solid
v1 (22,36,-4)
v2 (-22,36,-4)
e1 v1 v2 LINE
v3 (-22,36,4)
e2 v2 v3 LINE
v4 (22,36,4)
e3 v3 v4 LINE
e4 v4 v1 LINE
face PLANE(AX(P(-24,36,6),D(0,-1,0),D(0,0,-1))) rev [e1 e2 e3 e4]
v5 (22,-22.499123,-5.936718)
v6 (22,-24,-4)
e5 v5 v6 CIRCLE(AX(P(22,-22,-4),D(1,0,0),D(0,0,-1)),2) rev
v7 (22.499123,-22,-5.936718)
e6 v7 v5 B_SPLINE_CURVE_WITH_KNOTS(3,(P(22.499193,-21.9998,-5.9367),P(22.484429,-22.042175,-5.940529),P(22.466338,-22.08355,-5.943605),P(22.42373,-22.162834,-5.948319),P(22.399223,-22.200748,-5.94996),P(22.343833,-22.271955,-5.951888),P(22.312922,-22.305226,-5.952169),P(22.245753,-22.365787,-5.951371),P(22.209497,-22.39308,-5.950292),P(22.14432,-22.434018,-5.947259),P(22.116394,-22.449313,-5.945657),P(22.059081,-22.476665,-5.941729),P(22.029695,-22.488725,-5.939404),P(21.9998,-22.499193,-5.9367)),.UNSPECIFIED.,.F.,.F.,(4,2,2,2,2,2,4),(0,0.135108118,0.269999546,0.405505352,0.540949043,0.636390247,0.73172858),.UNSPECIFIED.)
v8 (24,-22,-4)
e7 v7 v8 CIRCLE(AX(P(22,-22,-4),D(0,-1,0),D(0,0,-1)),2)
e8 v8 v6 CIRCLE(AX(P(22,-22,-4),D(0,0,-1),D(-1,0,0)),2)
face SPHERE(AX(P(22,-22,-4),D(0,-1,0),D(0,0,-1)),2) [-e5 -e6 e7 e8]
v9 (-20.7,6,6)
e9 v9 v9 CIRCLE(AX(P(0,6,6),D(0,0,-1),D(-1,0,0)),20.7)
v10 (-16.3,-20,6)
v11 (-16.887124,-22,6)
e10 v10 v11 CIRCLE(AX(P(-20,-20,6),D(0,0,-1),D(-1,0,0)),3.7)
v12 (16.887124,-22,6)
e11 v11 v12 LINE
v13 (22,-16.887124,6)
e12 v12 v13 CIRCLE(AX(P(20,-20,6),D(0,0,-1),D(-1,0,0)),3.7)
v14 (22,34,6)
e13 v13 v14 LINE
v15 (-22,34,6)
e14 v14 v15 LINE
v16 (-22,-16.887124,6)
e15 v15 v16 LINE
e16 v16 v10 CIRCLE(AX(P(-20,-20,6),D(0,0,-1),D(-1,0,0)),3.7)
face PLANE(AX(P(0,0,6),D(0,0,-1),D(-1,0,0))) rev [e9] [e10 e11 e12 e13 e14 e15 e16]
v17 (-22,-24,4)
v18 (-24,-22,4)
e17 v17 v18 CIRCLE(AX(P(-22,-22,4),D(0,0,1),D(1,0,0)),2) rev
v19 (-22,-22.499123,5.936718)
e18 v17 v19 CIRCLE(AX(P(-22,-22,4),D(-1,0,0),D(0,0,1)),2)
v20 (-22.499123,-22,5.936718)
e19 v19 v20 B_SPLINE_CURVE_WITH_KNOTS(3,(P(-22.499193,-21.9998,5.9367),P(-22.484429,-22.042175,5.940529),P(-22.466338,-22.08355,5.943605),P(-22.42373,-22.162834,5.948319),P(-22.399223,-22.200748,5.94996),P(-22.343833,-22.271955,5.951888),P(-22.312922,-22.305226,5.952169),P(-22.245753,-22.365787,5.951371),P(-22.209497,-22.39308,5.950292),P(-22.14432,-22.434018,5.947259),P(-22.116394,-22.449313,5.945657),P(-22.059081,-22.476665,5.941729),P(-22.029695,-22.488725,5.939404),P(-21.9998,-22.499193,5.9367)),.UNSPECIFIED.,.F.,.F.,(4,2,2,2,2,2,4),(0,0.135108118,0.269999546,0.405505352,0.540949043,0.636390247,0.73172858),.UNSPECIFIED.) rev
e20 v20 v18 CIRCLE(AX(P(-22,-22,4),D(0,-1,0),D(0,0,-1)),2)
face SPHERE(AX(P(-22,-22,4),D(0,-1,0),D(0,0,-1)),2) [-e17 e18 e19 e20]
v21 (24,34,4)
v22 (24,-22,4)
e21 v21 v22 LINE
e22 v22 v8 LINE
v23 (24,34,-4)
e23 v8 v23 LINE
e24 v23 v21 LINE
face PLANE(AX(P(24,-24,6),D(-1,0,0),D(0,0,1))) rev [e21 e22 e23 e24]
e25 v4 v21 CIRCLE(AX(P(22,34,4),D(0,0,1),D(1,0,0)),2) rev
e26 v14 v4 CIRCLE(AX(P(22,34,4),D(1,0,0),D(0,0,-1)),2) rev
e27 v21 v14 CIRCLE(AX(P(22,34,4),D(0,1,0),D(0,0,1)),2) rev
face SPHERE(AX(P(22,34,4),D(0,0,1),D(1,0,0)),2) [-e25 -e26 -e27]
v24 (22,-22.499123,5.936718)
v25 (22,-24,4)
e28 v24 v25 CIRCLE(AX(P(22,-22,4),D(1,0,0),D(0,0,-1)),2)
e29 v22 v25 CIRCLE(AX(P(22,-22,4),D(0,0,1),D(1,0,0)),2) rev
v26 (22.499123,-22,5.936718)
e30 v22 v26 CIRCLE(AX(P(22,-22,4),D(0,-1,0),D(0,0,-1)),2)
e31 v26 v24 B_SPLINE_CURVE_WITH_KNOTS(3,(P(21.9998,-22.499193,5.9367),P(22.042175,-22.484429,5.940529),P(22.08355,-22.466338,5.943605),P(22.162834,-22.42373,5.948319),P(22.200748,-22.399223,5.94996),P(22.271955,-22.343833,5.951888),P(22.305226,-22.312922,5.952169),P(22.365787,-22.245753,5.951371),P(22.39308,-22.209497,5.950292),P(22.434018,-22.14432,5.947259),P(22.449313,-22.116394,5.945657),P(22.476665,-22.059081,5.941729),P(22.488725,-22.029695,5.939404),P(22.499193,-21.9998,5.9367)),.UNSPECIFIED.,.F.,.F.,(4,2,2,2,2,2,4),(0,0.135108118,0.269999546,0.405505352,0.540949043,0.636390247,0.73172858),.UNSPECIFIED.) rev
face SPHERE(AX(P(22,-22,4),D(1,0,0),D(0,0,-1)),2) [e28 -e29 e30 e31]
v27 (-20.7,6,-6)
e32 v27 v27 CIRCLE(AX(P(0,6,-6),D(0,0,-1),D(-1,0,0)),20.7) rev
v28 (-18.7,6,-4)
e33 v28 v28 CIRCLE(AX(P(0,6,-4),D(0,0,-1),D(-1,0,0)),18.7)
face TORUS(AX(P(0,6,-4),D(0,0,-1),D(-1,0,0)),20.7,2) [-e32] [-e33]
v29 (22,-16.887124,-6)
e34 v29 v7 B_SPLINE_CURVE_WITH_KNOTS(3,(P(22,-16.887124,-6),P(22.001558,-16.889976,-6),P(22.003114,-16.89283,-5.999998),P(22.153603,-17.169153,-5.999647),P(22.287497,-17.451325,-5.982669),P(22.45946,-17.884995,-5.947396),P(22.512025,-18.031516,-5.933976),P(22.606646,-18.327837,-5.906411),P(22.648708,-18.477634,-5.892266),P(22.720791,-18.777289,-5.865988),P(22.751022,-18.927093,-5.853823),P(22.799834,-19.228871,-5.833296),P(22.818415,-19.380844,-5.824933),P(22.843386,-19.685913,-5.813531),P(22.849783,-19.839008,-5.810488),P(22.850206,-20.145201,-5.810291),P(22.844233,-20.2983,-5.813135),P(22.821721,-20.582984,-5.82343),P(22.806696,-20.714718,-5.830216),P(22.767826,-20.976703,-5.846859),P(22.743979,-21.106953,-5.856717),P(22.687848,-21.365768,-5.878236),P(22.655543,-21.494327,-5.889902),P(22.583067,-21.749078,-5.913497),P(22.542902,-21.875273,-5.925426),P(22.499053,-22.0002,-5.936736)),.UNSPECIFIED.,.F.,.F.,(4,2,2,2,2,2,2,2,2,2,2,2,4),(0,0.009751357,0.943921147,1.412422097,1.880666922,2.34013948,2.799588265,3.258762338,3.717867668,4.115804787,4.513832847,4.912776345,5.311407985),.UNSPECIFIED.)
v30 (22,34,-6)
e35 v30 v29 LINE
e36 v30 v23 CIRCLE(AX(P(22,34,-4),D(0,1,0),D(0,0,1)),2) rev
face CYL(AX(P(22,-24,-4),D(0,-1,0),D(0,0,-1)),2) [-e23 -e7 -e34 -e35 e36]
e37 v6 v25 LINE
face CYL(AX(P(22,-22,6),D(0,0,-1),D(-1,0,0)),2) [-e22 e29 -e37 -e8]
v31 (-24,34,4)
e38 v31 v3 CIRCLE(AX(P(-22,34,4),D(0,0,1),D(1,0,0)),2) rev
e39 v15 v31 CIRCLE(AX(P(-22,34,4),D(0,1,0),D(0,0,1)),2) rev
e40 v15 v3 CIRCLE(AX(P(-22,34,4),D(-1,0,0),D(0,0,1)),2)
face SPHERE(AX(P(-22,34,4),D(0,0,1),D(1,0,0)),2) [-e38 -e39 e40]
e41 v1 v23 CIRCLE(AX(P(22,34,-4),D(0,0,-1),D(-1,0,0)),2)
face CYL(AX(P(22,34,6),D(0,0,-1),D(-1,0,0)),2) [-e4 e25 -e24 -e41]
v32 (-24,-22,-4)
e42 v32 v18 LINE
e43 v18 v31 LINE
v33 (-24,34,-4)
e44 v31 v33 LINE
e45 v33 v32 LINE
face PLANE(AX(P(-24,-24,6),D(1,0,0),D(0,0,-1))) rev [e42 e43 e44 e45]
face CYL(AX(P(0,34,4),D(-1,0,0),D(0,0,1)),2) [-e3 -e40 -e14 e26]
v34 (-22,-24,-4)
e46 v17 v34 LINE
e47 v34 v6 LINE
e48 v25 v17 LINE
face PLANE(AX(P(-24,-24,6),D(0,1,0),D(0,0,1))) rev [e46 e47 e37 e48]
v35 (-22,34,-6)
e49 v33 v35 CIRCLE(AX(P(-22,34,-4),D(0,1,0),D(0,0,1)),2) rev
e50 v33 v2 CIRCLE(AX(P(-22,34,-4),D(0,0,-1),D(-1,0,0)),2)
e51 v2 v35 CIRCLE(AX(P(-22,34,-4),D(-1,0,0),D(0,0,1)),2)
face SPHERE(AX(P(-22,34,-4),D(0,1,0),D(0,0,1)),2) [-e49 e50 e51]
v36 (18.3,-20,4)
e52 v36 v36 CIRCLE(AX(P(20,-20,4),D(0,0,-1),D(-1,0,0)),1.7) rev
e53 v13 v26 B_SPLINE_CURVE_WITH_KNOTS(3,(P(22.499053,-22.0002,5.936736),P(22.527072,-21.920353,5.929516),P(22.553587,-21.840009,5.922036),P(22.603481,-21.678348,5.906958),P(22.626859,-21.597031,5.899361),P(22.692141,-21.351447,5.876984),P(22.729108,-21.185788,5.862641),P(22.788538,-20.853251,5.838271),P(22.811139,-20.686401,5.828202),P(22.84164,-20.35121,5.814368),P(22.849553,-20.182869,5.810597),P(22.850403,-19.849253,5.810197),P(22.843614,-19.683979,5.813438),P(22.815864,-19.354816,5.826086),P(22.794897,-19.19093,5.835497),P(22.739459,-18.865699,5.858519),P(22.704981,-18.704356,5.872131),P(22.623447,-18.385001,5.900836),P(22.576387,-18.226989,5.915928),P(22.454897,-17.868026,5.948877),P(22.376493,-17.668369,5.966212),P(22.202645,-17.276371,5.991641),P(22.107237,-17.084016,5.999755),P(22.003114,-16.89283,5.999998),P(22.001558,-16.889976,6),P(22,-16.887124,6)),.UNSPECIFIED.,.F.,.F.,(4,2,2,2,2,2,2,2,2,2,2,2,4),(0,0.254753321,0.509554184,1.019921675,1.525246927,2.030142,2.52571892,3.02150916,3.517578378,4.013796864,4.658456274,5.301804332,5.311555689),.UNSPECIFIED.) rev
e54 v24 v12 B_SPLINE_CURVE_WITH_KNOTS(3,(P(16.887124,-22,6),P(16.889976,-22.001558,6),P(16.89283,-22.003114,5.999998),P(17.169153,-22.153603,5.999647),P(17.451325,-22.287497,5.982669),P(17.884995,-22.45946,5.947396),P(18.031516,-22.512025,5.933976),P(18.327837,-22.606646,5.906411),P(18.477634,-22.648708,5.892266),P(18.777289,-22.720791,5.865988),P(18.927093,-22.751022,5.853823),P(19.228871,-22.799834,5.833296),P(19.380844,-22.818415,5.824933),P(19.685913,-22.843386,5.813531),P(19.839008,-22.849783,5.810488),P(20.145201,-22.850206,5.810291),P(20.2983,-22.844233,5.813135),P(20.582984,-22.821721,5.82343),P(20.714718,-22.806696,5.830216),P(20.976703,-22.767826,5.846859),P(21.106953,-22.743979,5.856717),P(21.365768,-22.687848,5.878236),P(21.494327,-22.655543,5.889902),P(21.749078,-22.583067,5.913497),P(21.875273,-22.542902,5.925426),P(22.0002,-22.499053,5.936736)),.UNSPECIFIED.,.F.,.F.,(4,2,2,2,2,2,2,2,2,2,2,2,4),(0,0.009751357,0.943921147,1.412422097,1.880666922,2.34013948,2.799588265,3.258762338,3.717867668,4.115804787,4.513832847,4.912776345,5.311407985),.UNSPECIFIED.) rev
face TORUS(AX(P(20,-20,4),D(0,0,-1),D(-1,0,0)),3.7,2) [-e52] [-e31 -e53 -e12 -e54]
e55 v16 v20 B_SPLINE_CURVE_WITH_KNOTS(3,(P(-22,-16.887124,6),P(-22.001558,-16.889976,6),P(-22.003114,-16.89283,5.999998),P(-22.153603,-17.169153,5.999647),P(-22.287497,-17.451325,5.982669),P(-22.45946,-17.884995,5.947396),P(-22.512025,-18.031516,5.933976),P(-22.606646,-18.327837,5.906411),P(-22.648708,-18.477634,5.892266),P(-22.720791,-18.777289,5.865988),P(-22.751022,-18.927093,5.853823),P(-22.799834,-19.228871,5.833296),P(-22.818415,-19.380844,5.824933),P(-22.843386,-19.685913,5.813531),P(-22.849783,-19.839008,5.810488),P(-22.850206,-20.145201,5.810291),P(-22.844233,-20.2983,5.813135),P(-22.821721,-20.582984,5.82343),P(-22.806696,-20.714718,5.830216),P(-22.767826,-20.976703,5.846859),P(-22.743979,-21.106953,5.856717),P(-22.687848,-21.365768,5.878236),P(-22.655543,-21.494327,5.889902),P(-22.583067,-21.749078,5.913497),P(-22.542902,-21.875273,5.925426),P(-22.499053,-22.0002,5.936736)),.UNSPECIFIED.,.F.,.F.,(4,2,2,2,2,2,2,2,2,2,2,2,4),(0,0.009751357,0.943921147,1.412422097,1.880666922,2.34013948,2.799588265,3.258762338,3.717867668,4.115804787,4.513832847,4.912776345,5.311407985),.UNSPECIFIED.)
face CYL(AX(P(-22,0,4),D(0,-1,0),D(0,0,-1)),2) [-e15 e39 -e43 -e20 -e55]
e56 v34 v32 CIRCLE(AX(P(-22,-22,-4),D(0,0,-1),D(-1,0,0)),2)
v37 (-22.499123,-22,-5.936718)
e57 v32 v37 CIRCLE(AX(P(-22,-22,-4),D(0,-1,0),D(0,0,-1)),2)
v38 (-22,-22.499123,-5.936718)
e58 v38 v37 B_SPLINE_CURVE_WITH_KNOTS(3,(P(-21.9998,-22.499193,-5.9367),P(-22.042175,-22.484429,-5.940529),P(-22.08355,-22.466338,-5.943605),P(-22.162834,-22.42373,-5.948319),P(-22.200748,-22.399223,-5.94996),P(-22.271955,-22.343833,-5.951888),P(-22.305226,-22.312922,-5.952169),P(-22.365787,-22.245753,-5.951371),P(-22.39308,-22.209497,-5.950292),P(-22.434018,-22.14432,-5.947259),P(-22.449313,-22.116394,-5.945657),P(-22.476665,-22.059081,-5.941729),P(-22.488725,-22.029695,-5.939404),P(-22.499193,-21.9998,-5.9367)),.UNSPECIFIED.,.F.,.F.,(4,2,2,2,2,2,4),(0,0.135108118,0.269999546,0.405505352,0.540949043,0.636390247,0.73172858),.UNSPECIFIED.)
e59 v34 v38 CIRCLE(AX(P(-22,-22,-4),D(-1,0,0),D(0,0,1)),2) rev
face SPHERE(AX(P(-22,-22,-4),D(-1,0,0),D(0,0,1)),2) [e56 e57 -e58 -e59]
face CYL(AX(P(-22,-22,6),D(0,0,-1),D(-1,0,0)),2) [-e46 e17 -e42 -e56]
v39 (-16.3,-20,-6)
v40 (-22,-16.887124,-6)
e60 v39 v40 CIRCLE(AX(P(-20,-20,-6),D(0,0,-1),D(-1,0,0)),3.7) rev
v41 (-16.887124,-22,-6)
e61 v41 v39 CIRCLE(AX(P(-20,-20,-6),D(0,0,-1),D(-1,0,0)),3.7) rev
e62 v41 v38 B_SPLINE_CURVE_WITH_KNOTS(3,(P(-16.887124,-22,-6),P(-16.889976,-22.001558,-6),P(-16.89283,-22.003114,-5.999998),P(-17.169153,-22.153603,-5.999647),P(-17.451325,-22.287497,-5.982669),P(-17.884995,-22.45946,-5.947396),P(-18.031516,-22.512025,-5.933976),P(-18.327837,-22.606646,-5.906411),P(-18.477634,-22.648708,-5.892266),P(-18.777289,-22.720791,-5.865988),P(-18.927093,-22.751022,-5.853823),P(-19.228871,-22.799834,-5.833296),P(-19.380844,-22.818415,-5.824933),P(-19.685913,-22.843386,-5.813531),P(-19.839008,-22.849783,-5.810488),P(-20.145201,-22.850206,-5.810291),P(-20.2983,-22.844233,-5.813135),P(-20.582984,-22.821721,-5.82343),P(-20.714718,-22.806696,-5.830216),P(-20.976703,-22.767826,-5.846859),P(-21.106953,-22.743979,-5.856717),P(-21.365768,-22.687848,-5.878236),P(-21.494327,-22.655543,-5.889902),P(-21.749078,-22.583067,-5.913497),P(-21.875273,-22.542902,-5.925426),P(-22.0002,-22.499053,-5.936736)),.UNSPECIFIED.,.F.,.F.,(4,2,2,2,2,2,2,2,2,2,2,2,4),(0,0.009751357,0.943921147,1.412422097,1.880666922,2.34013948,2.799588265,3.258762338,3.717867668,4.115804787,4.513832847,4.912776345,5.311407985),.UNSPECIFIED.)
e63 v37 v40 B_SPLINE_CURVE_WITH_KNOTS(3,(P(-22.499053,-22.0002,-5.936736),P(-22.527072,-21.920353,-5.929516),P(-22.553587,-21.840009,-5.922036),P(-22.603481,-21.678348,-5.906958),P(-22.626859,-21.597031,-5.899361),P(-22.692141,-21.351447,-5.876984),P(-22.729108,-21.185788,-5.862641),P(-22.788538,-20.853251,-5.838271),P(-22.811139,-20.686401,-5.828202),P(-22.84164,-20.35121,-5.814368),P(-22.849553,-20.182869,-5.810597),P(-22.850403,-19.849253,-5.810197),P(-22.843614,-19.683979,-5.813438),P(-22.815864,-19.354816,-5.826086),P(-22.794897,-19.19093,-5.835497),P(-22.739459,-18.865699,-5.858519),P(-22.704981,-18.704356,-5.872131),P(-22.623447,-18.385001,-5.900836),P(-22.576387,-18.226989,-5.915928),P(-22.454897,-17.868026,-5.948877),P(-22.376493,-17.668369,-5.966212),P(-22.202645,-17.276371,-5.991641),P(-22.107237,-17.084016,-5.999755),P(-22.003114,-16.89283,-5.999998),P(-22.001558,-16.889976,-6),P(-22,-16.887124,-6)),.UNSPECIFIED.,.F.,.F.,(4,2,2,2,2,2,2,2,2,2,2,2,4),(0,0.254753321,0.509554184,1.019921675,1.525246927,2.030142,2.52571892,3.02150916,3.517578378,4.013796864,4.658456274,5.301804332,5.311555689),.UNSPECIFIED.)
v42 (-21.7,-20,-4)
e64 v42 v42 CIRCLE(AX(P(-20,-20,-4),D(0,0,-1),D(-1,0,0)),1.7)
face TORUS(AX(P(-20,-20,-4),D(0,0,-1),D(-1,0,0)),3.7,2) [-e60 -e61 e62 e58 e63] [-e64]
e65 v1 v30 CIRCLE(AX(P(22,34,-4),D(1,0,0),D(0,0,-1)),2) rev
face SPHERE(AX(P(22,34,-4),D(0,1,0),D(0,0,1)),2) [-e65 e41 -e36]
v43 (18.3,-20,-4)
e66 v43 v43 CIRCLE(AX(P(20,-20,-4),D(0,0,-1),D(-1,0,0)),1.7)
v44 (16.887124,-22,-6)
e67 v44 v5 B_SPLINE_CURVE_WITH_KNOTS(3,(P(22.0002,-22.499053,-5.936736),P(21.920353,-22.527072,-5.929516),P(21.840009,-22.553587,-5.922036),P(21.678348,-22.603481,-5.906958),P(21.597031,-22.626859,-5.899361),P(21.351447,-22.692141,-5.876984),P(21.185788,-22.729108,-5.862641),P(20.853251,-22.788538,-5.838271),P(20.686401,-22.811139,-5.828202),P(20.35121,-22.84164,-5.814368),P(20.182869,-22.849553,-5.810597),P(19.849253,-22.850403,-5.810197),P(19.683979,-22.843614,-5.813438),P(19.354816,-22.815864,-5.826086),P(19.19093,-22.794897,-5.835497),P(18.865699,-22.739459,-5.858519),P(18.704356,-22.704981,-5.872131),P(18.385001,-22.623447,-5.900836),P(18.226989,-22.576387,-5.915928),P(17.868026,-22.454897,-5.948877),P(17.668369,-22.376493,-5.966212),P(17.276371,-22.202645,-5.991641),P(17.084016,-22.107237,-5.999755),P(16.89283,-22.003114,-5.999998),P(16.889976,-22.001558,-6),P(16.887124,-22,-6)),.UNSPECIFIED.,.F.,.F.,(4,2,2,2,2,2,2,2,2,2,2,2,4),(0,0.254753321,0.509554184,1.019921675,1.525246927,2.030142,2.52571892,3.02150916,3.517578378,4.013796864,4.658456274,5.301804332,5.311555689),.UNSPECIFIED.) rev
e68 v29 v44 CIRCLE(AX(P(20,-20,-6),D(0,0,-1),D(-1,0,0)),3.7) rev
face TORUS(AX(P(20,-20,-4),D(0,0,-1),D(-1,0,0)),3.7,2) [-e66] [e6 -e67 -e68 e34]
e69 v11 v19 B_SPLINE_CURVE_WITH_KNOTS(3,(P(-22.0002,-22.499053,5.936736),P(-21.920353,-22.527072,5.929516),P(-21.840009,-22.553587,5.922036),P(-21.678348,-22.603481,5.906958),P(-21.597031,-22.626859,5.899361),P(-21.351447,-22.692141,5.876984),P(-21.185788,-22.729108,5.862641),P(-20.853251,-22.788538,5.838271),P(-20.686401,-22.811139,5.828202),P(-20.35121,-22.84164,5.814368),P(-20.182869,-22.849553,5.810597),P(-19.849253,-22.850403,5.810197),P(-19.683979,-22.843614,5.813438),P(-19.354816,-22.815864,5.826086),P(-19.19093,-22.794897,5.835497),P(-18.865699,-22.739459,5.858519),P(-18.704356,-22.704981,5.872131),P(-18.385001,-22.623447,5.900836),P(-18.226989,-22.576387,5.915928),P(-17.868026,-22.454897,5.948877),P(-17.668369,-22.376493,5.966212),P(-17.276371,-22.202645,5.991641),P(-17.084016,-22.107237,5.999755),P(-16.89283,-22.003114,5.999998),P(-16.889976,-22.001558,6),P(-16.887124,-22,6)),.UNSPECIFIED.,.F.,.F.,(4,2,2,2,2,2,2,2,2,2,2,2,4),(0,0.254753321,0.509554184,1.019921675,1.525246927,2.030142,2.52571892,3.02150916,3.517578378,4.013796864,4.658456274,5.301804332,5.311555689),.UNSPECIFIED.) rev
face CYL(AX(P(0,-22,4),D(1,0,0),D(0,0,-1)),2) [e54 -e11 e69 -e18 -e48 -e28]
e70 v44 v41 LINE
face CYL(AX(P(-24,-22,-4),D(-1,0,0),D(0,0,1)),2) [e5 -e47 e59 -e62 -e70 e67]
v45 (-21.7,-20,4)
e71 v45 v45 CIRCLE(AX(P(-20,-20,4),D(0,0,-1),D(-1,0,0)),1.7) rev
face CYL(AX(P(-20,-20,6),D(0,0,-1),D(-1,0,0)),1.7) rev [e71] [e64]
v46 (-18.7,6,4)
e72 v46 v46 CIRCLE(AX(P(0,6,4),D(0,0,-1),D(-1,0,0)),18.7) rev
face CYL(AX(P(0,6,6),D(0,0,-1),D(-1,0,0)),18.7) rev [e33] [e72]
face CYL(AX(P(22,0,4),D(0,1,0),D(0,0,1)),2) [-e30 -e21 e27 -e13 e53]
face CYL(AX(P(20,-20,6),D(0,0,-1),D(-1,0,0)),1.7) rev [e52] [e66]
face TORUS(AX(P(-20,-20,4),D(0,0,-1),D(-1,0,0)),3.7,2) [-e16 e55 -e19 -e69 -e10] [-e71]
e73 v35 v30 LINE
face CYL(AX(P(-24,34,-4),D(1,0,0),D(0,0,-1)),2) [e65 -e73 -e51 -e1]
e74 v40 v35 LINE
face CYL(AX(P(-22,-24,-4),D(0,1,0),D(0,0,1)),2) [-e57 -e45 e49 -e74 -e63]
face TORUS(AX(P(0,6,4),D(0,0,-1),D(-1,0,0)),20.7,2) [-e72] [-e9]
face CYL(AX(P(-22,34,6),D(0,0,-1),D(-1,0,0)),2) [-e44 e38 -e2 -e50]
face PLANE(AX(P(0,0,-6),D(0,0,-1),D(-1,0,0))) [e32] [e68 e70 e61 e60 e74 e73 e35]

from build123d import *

# Parameters (mm, degrees)
SKETCH_1_W      = 48
SKETCH_1_H      = 60
SKETCH_1_R      = 18.7
SKETCH_1_R_2    = 1.7
EXTRUDE_1_DEPTH = 6
FILLET_1_R      = 2


with BuildPart() as part:
    # 草图1 → 凸台-拉伸1 (new, symmetric)
    with BuildSketch(Plane.XY):
        with Locations((0, 6)):
            Rectangle(SKETCH_1_W, SKETCH_1_H)
        with Locations((0, 6)):
            Circle(SKETCH_1_R, mode=Mode.SUBTRACT)
        with Locations((20, -20)):
            Circle(SKETCH_1_R_2, mode=Mode.SUBTRACT)
        with Locations((-20, -20)):
            Circle(SKETCH_1_R_2, mode=Mode.SUBTRACT)
    extrude(amount=EXTRUDE_1_DEPTH, both=True)

    # 圆角1
    # the kernel refuses this fillet: 2 mm, written as the material it takes off along each edge
    with BuildSketch(Plane(origin=(-22, 34, 4), x_dir=(0, 1, 0), z_dir=(-1, 0, 0))) as fillet_1_piece_1_section:
        Polygon((0, 0), (FILLET_1_R, 0), (FILLET_1_R, -FILLET_1_R), (0, -FILLET_1_R), align=None)
    fillet_1_piece_1 = extrude(amount=FILLET_1_R, mode=Mode.PRIVATE)
    fillet_1_piece_1 = fillet_1_piece_1 - Plane(origin=(-22, 34, 4), x_dir=(0, -0.7071067811865475, -0.7071067811865475), z_dir=(-1, 0, 0)) * Sphere(FILLET_1_R, mode=Mode.PRIVATE)
    add(fillet_1_piece_1, mode=Mode.SUBTRACT)
    with BuildSketch(Plane(origin=(-22, -22, 4), x_dir=(-1, 0, 0), z_dir=(0, -1, 0))) as fillet_1_piece_2_section:
        Polygon((0, 0), (FILLET_1_R, 0), (FILLET_1_R, -FILLET_1_R), (0, -FILLET_1_R), align=None)
    fillet_1_piece_2 = extrude(amount=FILLET_1_R, mode=Mode.PRIVATE)
    fillet_1_piece_2 = fillet_1_piece_2 - Plane(origin=(-22, -22, 4), x_dir=(0.7071067811865475, 0, -0.7071067811865475), z_dir=(0, -1, 0)) * Sphere(FILLET_1_R, mode=Mode.PRIVATE)
    add(fillet_1_piece_2, mode=Mode.SUBTRACT)
    with BuildSketch(Plane(origin=(22, -22, 4), x_dir=(0, 0, 1), z_dir=(0, -1, 0))) as fillet_1_piece_3_section:
        Polygon((0, 0), (FILLET_1_R, 0), (FILLET_1_R, -FILLET_1_R), (0, -FILLET_1_R), align=None)
    fillet_1_piece_3 = extrude(amount=FILLET_1_R, mode=Mode.PRIVATE)
    fillet_1_piece_3 = fillet_1_piece_3 - Plane(origin=(22, -22, 4), x_dir=(-0.7071067811865475, 0, -0.7071067811865475), z_dir=(0, -1, 0)) * Sphere(FILLET_1_R, mode=Mode.PRIVATE)
    add(fillet_1_piece_3, mode=Mode.SUBTRACT)
    with BuildSketch(Plane(origin=(22, 34, 4), x_dir=(0, 0, 1), z_dir=(0, 1, 0))) as fillet_1_piece_4_section:
        Polygon((0, 0), (FILLET_1_R, 0), (FILLET_1_R, FILLET_1_R), (0, FILLET_1_R), align=None)
    fillet_1_piece_4 = extrude(amount=FILLET_1_R, mode=Mode.PRIVATE)
    fillet_1_piece_4 = fillet_1_piece_4 - Plane(origin=(22, 34, 4), x_dir=(-0.7071067811865475, 0, -0.7071067811865475), z_dir=(0, 1, 0)) * Sphere(FILLET_1_R, mode=Mode.PRIVATE)
    add(fillet_1_piece_4, mode=Mode.SUBTRACT)
    with BuildSketch(Plane(origin=(-22, -22, -4), x_dir=(0, 0, -1), z_dir=(0, -1, 0))) as fillet_1_piece_5_section:
        Polygon((0, 0), (FILLET_1_R, 0), (FILLET_1_R, -FILLET_1_R), (0, -FILLET_1_R), align=None)
    fillet_1_piece_5 = extrude(amount=FILLET_1_R, mode=Mode.PRIVATE)
    fillet_1_piece_5 = fillet_1_piece_5 - Plane(origin=(-22, -22, -4), x_dir=(0.7071067811865475, 0, 0.7071067811865475), z_dir=(0, -1, 0)) * Sphere(FILLET_1_R, mode=Mode.PRIVATE)
    add(fillet_1_piece_5, mode=Mode.SUBTRACT)
    with BuildSketch(Plane(origin=(22, -22, -4), x_dir=(0, 0, -1), z_dir=(0, -1, 0))) as fillet_1_piece_6_section:
        Polygon((0, 0), (FILLET_1_R, 0), (FILLET_1_R, FILLET_1_R), (0, FILLET_1_R), align=None)
    fillet_1_piece_6 = extrude(amount=FILLET_1_R, mode=Mode.PRIVATE)
    fillet_1_piece_6 = fillet_1_piece_6 - Plane(origin=(22, -22, -4), x_dir=(-0.7071067811865475, 0, 0.7071067811865475), z_dir=(0, -1, 0)) * Sphere(FILLET_1_R, mode=Mode.PRIVATE)
    add(fillet_1_piece_6, mode=Mode.SUBTRACT)
    with BuildSketch(Plane(origin=(-22, 34, -4), x_dir=(-1, 0, 0), z_dir=(0, 0, -1))) as fillet_1_piece_7_section:
        Polygon((0, 0), (FILLET_1_R, 0), (FILLET_1_R, FILLET_1_R), (0, FILLET_1_R), align=None)
    fillet_1_piece_7 = extrude(amount=FILLET_1_R, mode=Mode.PRIVATE)
    fillet_1_piece_7 = fillet_1_piece_7 - Plane(origin=(-22, 34, -4), x_dir=(0.7071067811865475, -0.7071067811865475, 0), z_dir=(0, 0, -1)) * Sphere(FILLET_1_R, mode=Mode.PRIVATE)
    add(fillet_1_piece_7, mode=Mode.SUBTRACT)
    with BuildSketch(Plane(origin=(22, 34, -4), x_dir=(0, 1, 0), z_dir=(0, 0, -1))) as fillet_1_piece_8_section:
        Polygon((0, 0), (FILLET_1_R, 0), (FILLET_1_R, FILLET_1_R), (0, FILLET_1_R), align=None)
    fillet_1_piece_8 = extrude(amount=FILLET_1_R, mode=Mode.PRIVATE)
    fillet_1_piece_8 = fillet_1_piece_8 - Plane(origin=(22, 34, -4), x_dir=(-0.7071067811865475, -0.7071067811865475, 0), z_dir=(0, 0, -1)) * Sphere(FILLET_1_R, mode=Mode.PRIVATE)
    add(fillet_1_piece_8, mode=Mode.SUBTRACT)
    with BuildSketch(Plane(origin=(0, 6, -6), x_dir=(1, 0, 0), z_dir=(0, -1, 0))) as fillet_1_piece_9:
        with BuildLine():
            CenterArc((18.7 + FILLET_1_R, FILLET_1_R), FILLET_1_R, 180, 90)
            Line((18.7 + FILLET_1_R, 0), (18.7, 0))
            Line((18.7, 0), (18.7, FILLET_1_R))
        make_face()
    revolve(axis=Axis((0, 6, -6), (0, 0, 1)), mode=Mode.SUBTRACT)
    with BuildSketch(Plane(origin=(0, 6, 6), x_dir=(1, 0, 0), z_dir=(0, -1, 0))) as fillet_1_piece_10:
        with BuildLine():
            CenterArc((18.7 + FILLET_1_R, -FILLET_1_R), FILLET_1_R, 90, 90)
            Line((18.7, -FILLET_1_R), (18.7, 0))
            Line((18.7, 0), (18.7 + FILLET_1_R, 0))
        make_face()
    revolve(axis=Axis((0, 6, 6), (0, 0, 1)), mode=Mode.SUBTRACT)
    with BuildSketch(Plane(origin=(-24, 34, 6), x_dir=(0, 0, -1), z_dir=(0, -1, 0))) as fillet_1_piece_11:
        with BuildLine():
            CenterArc((FILLET_1_R, FILLET_1_R), FILLET_1_R, 180, 90)
            Line((0, FILLET_1_R), (0, 0))
            Line((0, 0), (FILLET_1_R, 0))
        make_face()
    extrude(amount=56, mode=Mode.SUBTRACT)
    with BuildSketch(Plane(origin=(20, -20, -6), x_dir=(1, 0, 0), z_dir=(0, -1, 0))) as fillet_1_piece_12:
        with BuildLine():
            CenterArc((1.7 + FILLET_1_R, FILLET_1_R), FILLET_1_R, 180, 90)
            Line((1.7 + FILLET_1_R, 0), (1.7, 0))
            Line((1.7, 0), (1.7, FILLET_1_R))
        make_face()
    revolve(axis=Axis((20, -20, -6), (0, 0, 1)), mode=Mode.SUBTRACT)
    with BuildSketch(Plane(origin=(20, -20, 6), x_dir=(1, 0, 0), z_dir=(0, -1, 0))) as fillet_1_piece_13:
        with BuildLine():
            CenterArc((1.7 + FILLET_1_R, -FILLET_1_R), FILLET_1_R, 90, 90)
            Line((1.7, -FILLET_1_R), (1.7, 0))
            Line((1.7, 0), (1.7 + FILLET_1_R, 0))
        make_face()
    revolve(axis=Axis((20, -20, 6), (0, 0, 1)), mode=Mode.SUBTRACT)
    with BuildSketch(Plane(origin=(-22, -24, 6), x_dir=(0, 0, -1), z_dir=(1, 0, 0)), Plane(origin=(22, 36, 6), x_dir=(0, 0, -1), z_dir=(-1, 0, 0))) as fillet_1_piece_14:
        with BuildLine():
            CenterArc((FILLET_1_R, FILLET_1_R), FILLET_1_R, 180, 90)
            Line((0, FILLET_1_R), (0, 0))
            Line((0, 0), (FILLET_1_R, 0))
        make_face()
    extrude(amount=44, mode=Mode.SUBTRACT)
    with BuildSketch(Plane(origin=(-20, -20, -6), x_dir=(1, 0, 0), z_dir=(0, -1, 0))) as fillet_1_piece_15:
        with BuildLine():
            CenterArc((1.7 + FILLET_1_R, FILLET_1_R), FILLET_1_R, 180, 90)
            Line((1.7 + FILLET_1_R, 0), (1.7, 0))
            Line((1.7, 0), (1.7, FILLET_1_R))
        make_face()
    revolve(axis=Axis((-20, -20, -6), (0, 0, 1)), mode=Mode.SUBTRACT)
    with BuildSketch(Plane(origin=(-20, -20, 6), x_dir=(1, 0, 0), z_dir=(0, -1, 0))) as fillet_1_piece_16:
        with BuildLine():
            CenterArc((1.7 + FILLET_1_R, -FILLET_1_R), FILLET_1_R, 90, 90)
            Line((1.7, -FILLET_1_R), (1.7, 0))
            Line((1.7, 0), (1.7 + FILLET_1_R, 0))
        make_face()
    revolve(axis=Axis((-20, -20, 6), (0, 0, 1)), mode=Mode.SUBTRACT)
    with BuildSketch(Plane(origin=(24, -22, 6), x_dir=(-1, 0, 0), z_dir=(0, 1, 0)), Plane(origin=(-24, 34, -6), x_dir=(0, 0, 1), z_dir=(0, -1, 0)), Plane(origin=(24, -22, -6), x_dir=(0, 0, 1), z_dir=(0, 1, 0))) as fillet_1_piece_17:
        with BuildLine():
            CenterArc((FILLET_1_R, -FILLET_1_R), FILLET_1_R, 90, 90)
            Line((0, -FILLET_1_R), (0, 0))
            Line((0, 0), (FILLET_1_R, 0))
        make_face()
    extrude(amount=56, mode=Mode.SUBTRACT)
    with BuildSketch(Plane(origin=(-22, -24, -6), x_dir=(0, 0, 1), z_dir=(1, 0, 0)), Plane(origin=(22, 36, -6), x_dir=(0, 0, 1), z_dir=(-1, 0, 0))) as fillet_1_piece_18:
        with BuildLine():
            CenterArc((FILLET_1_R, -FILLET_1_R), FILLET_1_R, 90, 90)
            Line((0, -FILLET_1_R), (0, 0))
            Line((0, 0), (FILLET_1_R, 0))
        make_face()
    extrude(amount=44, mode=Mode.SUBTRACT)
    with BuildSketch(Plane(origin=(24, -24, -4), x_dir=(-1, 0, 0), z_dir=(0, 0, 1)), Plane(origin=(-24, -24, 4), x_dir=(1, 0, 0), z_dir=(0, 0, -1)), Plane(origin=(-24, 36, 4), x_dir=(0, -1, 0), z_dir=(0, 0, -1))) as fillet_1_piece_19:
        with BuildLine():
            CenterArc((FILLET_1_R, -FILLET_1_R), FILLET_1_R, 90, 90)
            Line((0, -FILLET_1_R), (0, 0))
            Line((0, 0), (FILLET_1_R, 0))
        make_face()
    extrude(amount=8, mode=Mode.SUBTRACT)
    with BuildSketch(Plane(origin=(24, 36, -4), x_dir=(-1, 0, 0), z_dir=(0, 0, 1))) as fillet_1_piece_20:
        with BuildLine():
            CenterArc((FILLET_1_R, FILLET_1_R), FILLET_1_R, 180, 90)
            Line((0, FILLET_1_R), (0, 0))
            Line((0, 0), (FILLET_1_R, 0))
        make_face()
    extrude(amount=8, mode=Mode.SUBTRACT)


solid = part.part
